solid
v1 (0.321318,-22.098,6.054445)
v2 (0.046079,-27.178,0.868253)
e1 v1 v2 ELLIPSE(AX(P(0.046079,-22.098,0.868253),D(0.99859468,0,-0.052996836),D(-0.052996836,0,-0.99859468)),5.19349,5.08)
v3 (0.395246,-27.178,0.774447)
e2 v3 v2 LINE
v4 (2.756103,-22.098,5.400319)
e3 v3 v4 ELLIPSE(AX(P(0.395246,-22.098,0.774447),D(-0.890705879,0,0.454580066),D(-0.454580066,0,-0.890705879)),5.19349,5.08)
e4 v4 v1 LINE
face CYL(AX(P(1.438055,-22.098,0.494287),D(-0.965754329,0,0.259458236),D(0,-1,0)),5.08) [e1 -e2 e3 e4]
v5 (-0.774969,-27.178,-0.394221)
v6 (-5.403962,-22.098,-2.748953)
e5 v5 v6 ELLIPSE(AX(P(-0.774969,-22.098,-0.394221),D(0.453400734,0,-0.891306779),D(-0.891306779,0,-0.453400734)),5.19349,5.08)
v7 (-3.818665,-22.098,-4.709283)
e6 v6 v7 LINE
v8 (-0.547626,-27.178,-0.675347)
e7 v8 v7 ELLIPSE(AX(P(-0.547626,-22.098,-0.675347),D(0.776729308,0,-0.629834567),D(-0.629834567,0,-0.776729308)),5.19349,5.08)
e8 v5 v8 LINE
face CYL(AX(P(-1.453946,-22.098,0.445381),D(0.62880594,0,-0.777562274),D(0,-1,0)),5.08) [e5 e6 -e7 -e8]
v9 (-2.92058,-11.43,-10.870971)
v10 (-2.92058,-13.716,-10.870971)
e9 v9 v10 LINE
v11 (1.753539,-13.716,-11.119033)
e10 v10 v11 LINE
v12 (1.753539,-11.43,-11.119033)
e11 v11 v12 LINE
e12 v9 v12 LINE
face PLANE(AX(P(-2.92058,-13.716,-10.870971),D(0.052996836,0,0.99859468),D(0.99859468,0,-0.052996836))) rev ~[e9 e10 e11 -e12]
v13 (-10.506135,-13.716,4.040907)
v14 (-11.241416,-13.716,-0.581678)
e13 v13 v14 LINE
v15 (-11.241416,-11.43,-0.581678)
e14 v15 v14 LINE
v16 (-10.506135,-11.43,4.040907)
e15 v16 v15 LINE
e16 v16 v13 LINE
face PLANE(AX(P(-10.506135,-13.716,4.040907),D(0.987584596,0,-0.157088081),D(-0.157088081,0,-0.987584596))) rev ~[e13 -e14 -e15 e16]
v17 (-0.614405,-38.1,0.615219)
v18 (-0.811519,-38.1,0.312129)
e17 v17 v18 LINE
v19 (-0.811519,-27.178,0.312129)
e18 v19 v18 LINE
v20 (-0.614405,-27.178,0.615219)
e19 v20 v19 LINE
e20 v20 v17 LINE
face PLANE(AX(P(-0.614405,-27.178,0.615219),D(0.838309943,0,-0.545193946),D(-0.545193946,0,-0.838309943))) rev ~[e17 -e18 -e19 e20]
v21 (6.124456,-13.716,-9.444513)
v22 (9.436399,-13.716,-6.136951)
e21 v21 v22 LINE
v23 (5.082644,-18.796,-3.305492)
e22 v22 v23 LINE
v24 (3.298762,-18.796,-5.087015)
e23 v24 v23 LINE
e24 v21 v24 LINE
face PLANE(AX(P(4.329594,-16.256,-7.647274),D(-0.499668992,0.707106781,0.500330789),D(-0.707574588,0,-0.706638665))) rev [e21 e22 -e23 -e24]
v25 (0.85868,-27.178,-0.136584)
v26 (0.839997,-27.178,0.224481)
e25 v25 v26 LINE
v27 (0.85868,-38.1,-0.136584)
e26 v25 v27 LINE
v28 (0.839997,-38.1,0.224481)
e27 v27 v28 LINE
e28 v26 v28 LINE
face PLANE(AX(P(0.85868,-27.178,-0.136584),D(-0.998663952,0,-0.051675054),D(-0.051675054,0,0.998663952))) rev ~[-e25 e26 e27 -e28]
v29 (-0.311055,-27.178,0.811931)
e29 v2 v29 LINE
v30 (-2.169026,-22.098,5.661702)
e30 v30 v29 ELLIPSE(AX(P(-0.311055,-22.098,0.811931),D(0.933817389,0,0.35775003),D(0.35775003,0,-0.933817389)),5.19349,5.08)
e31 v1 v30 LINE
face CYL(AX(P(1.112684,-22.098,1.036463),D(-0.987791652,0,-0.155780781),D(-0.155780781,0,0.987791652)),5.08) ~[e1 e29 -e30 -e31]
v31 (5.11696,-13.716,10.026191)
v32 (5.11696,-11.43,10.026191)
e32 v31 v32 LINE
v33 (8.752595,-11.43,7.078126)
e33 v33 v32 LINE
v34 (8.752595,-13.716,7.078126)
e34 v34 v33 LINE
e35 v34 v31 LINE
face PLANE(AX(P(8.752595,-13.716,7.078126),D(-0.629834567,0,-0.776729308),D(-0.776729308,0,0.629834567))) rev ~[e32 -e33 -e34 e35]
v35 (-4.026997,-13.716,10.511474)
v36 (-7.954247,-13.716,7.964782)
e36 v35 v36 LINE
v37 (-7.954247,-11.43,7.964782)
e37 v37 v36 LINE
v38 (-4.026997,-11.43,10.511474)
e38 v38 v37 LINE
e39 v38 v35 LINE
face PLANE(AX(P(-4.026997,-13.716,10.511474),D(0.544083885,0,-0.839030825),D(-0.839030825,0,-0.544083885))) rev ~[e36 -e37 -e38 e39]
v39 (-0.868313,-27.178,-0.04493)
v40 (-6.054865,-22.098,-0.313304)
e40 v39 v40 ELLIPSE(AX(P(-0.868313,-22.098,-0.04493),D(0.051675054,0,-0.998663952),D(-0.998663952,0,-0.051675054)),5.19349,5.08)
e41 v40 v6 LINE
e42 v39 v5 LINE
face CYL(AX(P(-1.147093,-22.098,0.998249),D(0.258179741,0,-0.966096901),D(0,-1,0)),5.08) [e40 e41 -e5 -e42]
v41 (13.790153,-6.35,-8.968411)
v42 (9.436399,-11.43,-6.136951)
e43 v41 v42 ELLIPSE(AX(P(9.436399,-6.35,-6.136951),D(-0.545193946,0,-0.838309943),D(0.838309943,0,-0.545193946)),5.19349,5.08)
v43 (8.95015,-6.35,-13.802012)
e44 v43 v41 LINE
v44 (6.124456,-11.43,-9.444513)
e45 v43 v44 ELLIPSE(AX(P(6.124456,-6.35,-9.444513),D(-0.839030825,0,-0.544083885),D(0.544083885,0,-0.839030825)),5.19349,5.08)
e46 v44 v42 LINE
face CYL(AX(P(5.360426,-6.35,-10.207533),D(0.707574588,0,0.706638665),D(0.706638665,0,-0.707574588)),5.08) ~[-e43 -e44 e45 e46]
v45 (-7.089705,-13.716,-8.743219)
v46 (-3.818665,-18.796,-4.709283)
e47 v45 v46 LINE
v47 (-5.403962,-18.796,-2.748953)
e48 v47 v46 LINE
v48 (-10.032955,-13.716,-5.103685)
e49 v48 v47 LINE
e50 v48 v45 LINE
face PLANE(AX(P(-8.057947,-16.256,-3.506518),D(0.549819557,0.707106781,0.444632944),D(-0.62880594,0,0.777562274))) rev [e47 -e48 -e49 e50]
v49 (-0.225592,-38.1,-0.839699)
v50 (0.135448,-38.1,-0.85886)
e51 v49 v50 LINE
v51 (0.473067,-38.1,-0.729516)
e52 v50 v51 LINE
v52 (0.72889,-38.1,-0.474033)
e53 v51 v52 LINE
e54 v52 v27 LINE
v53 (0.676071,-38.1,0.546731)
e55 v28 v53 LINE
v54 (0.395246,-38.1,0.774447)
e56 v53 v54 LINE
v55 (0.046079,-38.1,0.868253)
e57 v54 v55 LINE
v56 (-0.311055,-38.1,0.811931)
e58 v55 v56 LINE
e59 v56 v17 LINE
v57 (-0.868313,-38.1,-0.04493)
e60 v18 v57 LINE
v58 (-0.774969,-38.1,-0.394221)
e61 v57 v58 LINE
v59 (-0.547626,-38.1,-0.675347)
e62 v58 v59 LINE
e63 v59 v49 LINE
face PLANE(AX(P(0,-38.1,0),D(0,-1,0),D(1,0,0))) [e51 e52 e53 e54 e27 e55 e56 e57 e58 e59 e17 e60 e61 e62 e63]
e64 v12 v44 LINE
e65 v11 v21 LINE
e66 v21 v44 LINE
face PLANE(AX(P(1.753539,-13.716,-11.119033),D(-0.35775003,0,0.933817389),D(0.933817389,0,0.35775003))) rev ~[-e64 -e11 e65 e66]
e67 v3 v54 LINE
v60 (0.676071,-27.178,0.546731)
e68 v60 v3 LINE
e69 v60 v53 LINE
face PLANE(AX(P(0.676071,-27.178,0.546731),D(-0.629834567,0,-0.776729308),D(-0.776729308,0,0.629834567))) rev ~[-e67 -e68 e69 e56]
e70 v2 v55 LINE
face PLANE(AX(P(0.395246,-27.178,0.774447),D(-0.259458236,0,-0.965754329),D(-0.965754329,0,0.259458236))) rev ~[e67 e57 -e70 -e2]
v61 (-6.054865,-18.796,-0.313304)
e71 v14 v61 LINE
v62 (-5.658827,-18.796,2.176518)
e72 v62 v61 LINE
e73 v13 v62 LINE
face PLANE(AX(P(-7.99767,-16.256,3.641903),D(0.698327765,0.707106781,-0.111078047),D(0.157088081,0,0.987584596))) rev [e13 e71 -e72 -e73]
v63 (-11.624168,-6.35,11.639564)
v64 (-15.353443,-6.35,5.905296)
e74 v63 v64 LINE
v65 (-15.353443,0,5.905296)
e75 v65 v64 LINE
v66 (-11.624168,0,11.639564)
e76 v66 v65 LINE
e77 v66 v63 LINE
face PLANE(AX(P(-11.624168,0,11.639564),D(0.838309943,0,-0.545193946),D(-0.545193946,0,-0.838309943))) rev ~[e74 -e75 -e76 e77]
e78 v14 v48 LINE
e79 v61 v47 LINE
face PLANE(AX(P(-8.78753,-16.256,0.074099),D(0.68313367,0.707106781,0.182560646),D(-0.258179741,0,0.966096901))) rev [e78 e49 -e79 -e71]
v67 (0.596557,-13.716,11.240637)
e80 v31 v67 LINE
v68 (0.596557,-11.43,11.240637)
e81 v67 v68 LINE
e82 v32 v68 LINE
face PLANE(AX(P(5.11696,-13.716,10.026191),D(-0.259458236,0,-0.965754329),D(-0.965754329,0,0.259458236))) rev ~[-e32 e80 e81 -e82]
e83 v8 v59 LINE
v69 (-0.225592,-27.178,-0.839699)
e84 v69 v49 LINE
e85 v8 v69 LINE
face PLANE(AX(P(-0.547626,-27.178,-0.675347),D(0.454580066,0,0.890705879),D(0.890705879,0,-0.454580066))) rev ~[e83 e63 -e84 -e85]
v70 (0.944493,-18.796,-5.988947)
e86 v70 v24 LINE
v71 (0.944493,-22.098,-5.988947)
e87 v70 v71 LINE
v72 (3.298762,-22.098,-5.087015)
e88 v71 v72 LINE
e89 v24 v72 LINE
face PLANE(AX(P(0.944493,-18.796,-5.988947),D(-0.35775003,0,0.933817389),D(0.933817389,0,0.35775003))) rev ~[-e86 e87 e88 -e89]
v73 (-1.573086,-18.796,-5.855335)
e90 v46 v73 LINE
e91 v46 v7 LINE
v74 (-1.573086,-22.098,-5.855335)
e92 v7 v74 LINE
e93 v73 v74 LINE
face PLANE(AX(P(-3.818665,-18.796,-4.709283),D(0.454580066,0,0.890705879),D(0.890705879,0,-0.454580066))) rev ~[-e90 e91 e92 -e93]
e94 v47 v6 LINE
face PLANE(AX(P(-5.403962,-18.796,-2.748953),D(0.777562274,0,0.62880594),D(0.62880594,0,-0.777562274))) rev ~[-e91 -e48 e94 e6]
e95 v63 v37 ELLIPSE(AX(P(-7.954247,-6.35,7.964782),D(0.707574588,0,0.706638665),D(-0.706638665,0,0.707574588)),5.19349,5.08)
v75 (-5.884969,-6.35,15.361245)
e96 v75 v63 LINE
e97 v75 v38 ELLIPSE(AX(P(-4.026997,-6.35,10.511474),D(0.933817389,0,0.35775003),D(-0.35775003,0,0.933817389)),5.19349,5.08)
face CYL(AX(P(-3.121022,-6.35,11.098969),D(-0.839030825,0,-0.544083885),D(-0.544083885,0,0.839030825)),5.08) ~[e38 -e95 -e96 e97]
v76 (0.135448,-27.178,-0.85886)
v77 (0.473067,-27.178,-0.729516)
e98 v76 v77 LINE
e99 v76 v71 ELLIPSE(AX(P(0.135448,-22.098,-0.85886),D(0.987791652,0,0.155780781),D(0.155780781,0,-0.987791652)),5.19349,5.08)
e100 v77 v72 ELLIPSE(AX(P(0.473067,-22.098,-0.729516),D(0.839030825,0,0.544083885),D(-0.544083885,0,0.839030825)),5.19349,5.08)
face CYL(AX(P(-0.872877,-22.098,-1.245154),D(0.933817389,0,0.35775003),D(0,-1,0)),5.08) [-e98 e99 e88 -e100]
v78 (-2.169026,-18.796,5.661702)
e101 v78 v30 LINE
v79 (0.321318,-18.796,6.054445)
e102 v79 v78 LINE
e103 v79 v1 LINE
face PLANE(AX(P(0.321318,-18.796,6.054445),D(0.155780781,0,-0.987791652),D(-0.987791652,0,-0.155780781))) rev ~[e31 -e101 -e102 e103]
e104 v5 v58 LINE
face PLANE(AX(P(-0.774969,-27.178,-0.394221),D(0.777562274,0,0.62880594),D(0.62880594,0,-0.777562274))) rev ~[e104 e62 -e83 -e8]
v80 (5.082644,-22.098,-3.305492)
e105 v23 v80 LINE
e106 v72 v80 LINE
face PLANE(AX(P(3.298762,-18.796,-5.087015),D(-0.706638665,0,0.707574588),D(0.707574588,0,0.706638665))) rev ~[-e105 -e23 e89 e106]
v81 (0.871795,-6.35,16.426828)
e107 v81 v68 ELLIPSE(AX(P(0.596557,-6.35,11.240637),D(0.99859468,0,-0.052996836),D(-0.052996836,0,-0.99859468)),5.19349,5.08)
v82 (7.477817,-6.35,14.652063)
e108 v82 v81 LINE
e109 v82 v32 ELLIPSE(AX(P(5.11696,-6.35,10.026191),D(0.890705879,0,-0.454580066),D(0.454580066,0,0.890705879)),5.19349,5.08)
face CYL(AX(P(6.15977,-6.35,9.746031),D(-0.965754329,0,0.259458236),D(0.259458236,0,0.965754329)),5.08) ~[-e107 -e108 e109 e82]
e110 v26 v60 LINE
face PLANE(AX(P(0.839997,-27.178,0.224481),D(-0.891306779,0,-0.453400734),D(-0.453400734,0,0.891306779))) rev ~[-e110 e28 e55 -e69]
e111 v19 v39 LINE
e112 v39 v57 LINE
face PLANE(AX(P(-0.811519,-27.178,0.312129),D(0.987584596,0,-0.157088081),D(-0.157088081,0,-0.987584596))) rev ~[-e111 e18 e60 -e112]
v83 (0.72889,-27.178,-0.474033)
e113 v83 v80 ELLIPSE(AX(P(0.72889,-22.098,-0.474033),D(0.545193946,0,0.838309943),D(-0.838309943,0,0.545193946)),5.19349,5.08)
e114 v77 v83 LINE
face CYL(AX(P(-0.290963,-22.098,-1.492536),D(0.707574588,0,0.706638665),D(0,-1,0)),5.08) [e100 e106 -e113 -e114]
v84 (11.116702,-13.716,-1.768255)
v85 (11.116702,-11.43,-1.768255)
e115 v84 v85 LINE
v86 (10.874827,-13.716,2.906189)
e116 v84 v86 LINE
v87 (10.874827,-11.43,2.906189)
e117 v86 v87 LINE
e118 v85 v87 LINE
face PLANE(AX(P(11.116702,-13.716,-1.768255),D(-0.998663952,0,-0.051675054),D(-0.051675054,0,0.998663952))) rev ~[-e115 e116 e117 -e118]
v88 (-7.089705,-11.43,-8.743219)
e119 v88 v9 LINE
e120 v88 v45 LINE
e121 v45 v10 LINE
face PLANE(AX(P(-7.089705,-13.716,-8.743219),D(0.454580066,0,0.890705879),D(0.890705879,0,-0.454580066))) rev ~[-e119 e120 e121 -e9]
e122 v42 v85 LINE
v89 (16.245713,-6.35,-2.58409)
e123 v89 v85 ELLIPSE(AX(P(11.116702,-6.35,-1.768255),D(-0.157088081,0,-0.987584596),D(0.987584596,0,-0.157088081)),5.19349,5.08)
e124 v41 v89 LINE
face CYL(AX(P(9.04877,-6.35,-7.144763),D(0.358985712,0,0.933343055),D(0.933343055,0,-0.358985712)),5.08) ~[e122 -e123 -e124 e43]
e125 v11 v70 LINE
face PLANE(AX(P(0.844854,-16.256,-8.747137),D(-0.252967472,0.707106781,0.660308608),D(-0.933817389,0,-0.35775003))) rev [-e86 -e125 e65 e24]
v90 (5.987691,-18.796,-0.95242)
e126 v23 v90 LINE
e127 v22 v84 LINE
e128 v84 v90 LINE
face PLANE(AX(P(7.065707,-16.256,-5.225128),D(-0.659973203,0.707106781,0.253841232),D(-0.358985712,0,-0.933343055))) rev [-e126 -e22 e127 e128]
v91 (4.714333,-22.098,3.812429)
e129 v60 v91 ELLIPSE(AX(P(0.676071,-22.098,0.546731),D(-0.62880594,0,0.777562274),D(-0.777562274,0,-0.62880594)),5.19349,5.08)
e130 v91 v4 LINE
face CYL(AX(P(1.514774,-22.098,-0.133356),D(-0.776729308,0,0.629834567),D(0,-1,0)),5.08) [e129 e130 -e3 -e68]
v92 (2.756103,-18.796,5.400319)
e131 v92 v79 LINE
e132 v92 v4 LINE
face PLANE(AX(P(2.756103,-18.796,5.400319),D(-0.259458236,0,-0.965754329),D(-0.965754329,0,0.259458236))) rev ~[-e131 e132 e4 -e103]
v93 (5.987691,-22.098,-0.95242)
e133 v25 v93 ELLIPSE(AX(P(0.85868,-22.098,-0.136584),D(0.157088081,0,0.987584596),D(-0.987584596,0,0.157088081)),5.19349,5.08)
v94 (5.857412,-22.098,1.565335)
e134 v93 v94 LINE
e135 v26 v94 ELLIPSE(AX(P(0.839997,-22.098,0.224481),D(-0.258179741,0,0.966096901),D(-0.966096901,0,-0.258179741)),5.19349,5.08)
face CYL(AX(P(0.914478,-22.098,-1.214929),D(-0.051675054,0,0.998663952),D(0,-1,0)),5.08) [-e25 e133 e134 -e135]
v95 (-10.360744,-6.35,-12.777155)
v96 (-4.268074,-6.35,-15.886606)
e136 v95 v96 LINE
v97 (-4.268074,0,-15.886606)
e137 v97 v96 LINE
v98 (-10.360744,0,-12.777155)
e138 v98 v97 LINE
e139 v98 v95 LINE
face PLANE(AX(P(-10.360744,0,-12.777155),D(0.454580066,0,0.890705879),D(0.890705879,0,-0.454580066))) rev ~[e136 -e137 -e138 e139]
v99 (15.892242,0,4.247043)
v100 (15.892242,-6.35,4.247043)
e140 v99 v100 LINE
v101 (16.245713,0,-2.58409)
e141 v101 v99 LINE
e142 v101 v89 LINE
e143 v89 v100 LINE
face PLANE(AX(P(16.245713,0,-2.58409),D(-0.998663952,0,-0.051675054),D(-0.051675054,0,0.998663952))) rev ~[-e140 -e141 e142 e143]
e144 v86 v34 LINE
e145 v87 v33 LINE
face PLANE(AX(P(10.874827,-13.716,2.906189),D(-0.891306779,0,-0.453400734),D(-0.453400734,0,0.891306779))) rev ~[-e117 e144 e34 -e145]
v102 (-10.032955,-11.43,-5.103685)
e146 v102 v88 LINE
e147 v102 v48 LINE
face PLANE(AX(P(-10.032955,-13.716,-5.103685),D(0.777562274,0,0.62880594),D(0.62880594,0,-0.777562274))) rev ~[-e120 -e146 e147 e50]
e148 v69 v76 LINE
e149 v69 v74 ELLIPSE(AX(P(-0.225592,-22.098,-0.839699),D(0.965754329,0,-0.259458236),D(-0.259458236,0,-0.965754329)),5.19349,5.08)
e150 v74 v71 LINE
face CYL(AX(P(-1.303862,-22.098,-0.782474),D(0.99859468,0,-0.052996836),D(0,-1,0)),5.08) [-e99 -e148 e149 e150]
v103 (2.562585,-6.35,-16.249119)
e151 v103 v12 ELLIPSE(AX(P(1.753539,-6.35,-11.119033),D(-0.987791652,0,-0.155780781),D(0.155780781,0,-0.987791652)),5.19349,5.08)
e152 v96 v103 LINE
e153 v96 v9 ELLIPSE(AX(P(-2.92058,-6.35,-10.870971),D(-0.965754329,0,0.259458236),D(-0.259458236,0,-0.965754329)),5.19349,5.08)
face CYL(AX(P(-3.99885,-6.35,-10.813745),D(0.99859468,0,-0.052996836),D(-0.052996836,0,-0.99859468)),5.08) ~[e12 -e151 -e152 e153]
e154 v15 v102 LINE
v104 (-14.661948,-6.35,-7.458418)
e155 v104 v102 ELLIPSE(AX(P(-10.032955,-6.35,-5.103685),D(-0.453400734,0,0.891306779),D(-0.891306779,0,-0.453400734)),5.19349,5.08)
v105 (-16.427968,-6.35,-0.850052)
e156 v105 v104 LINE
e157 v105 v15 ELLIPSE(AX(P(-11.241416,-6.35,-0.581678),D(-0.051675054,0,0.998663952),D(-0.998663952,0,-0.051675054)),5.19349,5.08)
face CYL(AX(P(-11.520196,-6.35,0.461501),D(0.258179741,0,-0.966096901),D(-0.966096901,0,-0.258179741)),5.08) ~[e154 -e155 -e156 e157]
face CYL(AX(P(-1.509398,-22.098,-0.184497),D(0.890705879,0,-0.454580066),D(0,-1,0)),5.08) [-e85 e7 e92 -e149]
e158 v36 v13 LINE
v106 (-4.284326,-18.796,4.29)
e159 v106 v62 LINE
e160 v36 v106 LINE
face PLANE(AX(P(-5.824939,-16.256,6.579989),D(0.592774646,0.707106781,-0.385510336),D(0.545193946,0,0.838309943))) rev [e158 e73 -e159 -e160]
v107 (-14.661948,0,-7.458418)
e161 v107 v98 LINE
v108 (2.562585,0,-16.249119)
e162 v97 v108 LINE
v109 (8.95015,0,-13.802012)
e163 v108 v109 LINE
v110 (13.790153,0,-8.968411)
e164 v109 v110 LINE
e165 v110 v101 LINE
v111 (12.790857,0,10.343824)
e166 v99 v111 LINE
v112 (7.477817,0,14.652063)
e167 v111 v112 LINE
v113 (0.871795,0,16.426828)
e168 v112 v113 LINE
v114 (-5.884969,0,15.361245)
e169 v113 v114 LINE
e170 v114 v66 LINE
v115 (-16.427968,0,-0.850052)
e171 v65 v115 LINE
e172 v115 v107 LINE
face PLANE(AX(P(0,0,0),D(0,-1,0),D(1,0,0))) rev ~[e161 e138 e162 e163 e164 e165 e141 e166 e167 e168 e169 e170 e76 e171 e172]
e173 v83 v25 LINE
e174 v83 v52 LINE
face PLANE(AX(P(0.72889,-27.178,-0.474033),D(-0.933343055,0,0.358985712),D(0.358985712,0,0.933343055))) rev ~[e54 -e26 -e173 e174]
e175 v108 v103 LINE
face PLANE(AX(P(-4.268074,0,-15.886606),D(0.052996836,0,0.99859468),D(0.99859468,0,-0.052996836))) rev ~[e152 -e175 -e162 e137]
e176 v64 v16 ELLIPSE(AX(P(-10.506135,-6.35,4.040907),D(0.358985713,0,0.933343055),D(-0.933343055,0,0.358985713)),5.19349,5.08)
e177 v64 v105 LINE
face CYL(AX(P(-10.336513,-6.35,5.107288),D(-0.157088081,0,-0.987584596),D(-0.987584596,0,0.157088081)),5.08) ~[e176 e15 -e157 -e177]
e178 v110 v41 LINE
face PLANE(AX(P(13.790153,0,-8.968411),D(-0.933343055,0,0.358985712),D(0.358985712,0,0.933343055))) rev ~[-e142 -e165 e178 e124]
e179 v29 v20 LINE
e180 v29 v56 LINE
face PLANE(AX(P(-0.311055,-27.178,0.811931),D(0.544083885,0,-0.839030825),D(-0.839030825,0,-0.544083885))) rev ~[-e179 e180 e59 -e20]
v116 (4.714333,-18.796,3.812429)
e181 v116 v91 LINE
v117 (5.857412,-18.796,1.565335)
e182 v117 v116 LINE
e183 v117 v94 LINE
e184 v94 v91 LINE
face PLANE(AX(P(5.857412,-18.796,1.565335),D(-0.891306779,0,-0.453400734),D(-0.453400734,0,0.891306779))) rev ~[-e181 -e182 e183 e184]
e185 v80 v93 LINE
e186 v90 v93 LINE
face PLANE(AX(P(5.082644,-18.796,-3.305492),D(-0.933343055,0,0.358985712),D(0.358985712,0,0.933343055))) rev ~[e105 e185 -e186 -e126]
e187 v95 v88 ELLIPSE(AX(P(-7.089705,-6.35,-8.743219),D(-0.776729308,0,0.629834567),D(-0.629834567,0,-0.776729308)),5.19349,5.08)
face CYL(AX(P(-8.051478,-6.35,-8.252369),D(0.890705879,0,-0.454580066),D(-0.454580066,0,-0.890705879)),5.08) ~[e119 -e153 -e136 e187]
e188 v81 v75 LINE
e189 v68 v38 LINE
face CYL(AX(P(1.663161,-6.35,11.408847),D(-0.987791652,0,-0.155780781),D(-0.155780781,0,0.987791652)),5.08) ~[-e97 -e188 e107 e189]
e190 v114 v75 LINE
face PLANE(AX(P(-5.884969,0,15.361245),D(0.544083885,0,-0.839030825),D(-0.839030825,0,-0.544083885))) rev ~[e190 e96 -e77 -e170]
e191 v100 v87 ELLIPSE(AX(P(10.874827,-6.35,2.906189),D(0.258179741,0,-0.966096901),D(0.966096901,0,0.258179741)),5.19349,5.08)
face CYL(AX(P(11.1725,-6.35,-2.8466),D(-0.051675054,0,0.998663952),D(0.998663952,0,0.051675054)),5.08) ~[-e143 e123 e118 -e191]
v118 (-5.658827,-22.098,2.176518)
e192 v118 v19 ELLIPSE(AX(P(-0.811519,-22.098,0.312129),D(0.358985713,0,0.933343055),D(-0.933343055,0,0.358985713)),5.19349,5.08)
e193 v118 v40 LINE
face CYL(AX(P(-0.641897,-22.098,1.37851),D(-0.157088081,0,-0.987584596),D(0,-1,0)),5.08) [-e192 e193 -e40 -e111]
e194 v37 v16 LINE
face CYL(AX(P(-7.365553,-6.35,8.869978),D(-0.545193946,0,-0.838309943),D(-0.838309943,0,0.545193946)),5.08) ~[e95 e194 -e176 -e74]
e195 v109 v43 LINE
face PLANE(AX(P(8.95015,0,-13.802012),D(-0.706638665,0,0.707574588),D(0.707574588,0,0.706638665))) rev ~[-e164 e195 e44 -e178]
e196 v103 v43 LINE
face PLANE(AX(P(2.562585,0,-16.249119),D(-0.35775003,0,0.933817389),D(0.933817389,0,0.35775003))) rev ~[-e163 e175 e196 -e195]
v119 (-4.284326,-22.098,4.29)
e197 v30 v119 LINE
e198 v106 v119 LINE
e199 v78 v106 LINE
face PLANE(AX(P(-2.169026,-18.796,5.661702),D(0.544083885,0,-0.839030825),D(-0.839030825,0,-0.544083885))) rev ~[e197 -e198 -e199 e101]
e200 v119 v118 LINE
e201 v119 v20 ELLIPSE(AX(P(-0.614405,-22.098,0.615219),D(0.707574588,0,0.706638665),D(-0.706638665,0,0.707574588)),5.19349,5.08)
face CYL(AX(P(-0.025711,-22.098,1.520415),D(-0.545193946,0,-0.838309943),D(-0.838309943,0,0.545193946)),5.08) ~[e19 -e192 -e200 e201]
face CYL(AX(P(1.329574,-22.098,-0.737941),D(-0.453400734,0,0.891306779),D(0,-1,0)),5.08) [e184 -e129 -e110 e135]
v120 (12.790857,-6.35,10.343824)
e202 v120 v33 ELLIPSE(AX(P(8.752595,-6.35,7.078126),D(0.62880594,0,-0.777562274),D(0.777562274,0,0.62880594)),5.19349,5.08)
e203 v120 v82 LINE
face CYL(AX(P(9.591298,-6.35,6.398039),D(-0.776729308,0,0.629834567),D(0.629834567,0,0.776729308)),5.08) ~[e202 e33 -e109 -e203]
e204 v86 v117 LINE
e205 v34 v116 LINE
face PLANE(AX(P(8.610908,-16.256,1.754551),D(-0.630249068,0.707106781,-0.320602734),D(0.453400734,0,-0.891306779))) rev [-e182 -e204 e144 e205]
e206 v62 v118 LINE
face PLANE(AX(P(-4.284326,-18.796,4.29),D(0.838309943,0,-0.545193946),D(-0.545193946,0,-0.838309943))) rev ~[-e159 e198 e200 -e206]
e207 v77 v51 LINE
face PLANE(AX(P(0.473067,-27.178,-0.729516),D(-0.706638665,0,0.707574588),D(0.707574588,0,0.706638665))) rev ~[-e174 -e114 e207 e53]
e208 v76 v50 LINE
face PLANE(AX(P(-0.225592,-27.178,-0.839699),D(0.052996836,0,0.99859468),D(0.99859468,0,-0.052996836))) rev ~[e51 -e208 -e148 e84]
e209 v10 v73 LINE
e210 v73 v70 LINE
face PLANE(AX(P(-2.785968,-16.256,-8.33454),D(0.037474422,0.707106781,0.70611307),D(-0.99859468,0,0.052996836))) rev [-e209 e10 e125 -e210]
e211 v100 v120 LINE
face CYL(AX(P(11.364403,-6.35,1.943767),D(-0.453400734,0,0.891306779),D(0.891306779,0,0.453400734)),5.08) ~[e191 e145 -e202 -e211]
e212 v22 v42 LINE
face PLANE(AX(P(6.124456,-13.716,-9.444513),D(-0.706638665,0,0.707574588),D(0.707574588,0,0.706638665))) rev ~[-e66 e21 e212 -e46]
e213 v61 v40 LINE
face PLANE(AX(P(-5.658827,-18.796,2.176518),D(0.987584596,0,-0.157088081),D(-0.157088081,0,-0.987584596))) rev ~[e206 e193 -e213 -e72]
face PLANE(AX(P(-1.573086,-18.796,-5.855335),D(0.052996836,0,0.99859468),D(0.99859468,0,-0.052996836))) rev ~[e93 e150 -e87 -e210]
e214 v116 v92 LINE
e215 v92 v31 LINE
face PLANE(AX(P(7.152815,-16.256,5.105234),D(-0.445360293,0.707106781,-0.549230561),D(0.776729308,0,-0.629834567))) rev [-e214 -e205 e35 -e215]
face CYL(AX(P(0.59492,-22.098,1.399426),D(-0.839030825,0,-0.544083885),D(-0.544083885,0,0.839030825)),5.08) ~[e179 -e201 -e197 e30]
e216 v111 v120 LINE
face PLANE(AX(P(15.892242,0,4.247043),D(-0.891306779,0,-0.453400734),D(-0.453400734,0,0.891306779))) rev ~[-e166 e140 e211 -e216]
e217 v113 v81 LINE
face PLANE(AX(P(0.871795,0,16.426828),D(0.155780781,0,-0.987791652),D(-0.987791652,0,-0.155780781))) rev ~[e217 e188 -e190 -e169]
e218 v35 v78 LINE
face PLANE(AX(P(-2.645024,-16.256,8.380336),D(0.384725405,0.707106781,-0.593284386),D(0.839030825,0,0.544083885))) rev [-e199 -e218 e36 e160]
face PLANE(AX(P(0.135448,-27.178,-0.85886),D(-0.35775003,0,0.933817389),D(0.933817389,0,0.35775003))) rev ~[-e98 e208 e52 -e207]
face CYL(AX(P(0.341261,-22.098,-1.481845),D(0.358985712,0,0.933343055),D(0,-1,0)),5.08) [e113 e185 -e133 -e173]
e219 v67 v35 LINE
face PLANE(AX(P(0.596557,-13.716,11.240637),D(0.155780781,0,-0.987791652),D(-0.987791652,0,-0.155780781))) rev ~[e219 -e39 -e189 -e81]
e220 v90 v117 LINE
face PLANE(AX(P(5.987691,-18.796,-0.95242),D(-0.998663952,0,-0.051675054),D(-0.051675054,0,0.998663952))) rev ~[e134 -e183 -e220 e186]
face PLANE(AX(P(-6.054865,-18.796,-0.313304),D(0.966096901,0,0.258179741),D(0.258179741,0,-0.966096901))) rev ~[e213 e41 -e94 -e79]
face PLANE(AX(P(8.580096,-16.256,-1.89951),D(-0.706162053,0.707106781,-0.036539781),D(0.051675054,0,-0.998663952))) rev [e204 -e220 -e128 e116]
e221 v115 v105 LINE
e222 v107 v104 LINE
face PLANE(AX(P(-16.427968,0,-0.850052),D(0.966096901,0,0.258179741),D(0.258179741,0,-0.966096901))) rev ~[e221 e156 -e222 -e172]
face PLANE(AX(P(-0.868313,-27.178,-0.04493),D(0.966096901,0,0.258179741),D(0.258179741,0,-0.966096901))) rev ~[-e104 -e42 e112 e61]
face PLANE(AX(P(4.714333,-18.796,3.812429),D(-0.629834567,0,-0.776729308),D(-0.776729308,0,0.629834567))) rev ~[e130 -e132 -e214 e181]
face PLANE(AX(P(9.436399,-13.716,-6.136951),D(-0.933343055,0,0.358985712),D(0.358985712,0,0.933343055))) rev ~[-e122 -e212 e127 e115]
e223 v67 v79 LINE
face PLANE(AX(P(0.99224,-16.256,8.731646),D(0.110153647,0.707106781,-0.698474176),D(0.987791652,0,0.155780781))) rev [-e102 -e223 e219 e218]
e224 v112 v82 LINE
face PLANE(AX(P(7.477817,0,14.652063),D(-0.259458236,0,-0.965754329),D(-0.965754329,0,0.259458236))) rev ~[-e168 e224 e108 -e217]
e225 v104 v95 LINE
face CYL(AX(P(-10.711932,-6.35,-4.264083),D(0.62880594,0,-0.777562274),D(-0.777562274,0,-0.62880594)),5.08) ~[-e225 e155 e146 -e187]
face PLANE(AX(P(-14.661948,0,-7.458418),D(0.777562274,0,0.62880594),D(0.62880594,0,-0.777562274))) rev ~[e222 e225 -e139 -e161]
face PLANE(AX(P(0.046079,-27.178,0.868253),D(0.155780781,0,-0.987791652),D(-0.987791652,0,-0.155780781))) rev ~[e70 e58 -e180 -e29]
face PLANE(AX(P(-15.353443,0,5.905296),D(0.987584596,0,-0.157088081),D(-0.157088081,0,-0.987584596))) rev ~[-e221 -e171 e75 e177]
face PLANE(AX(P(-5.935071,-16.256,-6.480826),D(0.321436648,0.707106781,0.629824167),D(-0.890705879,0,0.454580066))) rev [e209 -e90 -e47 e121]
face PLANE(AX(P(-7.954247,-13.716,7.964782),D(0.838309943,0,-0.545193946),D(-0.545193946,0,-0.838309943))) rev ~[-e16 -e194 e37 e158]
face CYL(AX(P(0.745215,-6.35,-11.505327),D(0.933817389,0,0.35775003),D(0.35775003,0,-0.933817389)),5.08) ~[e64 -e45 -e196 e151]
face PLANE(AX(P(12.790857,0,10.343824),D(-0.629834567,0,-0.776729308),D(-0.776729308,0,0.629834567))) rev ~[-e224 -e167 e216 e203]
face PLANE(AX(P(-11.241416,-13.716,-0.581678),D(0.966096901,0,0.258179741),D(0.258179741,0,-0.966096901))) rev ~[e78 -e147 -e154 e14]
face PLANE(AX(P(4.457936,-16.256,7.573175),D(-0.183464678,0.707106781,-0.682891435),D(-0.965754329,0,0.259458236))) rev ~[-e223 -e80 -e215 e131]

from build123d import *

# Parameters (mm, degrees)
F1_DEPTH = 11.43
F2_R     = 5.08
F3_DEPTH = 2.286
F4_DEPTH = 5.08
F5_SIZE  = 5.08
F6_DEPTH = 8.382
F7_R     = 5.08
F8_DEPTH = 10.922


with BuildPart() as f1:
    # F0 (on Front) → F1 (new body)
    with BuildSketch(Plane.XZ):
        Polygon((-5.8849686034, 15.3612454542), (-11.6241677455, 11.6395636341), (-15.3534426822, 5.9052955195), (-16.4279678975, -0.8500518383), (-14.6619482199, -7.4584175109), (-10.3607444954, -12.7771550382), (-4.2680739233, -15.8866063825), (2.5625854044, -16.2491191581), (8.9501504353, -13.8020116126), (13.7901531464, -8.968410872), (16.2457130989, -2.5840904161), (15.8922416689, 4.2470427484), (12.7908572779, 10.3438236386), (7.4778174622, 14.652063451), (0.8717950735, 16.4268283828), align=None)
    extrude(amount=F1_DEPTH)

    # F2
    f2_edges = [f1.edges().sort_by_distance(p)[0] for p in [
        (-2.506587, -11.43, 15.894037),
        (-8.754568, -11.43, 13.500405),
        (-13.488805, -11.43, 8.77243),
        (-15.890705, -11.43, 2.527622),
        (-15.544958, -11.43, -4.154235),
        (-12.511346, -11.43, -10.117786),
        (-7.314409, -11.43, -14.331881),
        (-0.852744, -11.43, -16.067863),
        (5.756368, -11.43, -15.025565),
        (11.370152, -11.43, -11.385211),
        (15.017933, -11.43, -5.776251),
        (16.068977, -11.43, 0.831476),
        (14.341549, -11.43, 7.295433),
        (10.134337, -11.43, 12.497944),
        (4.174806, -11.43, 15.539446),
    ]]
    fillet(f2_edges, radius=F2_R)

    # F3 (add): a face of the model
    f3_faces = [f1.faces().sort_by_distance(p)[0] for p in [
        (0, -11.43, 0),
    ]]
    extrude(f3_faces, amount=F3_DEPTH)

    # F4 (add): a face of the model
    f4_faces = [f1.faces().sort_by_distance(p)[0] for p in [
        (0, -13.716, 0),
    ]]
    extrude(f4_faces, amount=F4_DEPTH)

    # F5
    f5_edges = [f1.edges().sort_by_distance(p)[0] for p in [
        (-5.990622, -18.796, 9.238128),
        (-1.71522, -18.796, 10.876055),
        (2.856758, -18.796, 10.633414),
        (6.934778, -18.796, 8.552159),
        (9.813711, -18.796, 4.992157),
        (10.995765, -18.796, 0.568967),
        (10.27655, -18.796, -3.952603),
        (7.780427, -18.796, -7.790732),
        (3.938998, -18.796, -10.281773),
        (-0.58352, -18.796, -10.995002),
        (-5.005142, -18.796, -9.807095),
        (-8.56133, -18.796, -6.923452),
        (-10.637186, -18.796, -2.842682),
        (-10.873776, -18.796, 1.729614),
        (-9.230191, -18.796, 6.002844),
    ]]
    chamfer(f5_edges, length=F5_SIZE)

    # F6 (add): a face of the model
    f6_faces = [f1.faces().sort_by_distance(p)[0] for p in [
        (0, -18.796, 0),
    ]]
    extrude(f6_faces, amount=F6_DEPTH)

    # F7
    f7_edges = [f1.edges().sort_by_distance(p)[0] for p in [
        (-3.226676, -27.178, 4.975851),
        (-0.923854, -27.178, 5.858074),
        (-4.971576, -27.178, 3.233259),
        (1.538711, -27.178, 5.727382),
        (-5.856846, -27.178, 0.931607),
        (3.735218, -27.178, 4.606374),
        (-5.729414, -27.178, -1.531129),
        (5.285873, -27.178, 2.688882),
        (-4.611314, -27.178, -3.729118),
        (5.922552, -27.178, 0.306458),
        (-2.695876, -27.178, -5.282309),
        (5.535168, -27.178, -2.128956),
        (-0.314296, -27.178, -5.922141),
        (4.190703, -27.178, -4.196253),
        (2.121628, -27.178, -5.537981),
    ]]
    fillet(f7_edges, radius=F7_R)

    # F8 (add): a face of the model
    f8_faces = [f1.faces().sort_by_distance(p)[0] for p in [
        (0, -27.178, 0),
    ]]
    extrude(f8_faces, amount=F8_DEPTH)


solid = f1.part
